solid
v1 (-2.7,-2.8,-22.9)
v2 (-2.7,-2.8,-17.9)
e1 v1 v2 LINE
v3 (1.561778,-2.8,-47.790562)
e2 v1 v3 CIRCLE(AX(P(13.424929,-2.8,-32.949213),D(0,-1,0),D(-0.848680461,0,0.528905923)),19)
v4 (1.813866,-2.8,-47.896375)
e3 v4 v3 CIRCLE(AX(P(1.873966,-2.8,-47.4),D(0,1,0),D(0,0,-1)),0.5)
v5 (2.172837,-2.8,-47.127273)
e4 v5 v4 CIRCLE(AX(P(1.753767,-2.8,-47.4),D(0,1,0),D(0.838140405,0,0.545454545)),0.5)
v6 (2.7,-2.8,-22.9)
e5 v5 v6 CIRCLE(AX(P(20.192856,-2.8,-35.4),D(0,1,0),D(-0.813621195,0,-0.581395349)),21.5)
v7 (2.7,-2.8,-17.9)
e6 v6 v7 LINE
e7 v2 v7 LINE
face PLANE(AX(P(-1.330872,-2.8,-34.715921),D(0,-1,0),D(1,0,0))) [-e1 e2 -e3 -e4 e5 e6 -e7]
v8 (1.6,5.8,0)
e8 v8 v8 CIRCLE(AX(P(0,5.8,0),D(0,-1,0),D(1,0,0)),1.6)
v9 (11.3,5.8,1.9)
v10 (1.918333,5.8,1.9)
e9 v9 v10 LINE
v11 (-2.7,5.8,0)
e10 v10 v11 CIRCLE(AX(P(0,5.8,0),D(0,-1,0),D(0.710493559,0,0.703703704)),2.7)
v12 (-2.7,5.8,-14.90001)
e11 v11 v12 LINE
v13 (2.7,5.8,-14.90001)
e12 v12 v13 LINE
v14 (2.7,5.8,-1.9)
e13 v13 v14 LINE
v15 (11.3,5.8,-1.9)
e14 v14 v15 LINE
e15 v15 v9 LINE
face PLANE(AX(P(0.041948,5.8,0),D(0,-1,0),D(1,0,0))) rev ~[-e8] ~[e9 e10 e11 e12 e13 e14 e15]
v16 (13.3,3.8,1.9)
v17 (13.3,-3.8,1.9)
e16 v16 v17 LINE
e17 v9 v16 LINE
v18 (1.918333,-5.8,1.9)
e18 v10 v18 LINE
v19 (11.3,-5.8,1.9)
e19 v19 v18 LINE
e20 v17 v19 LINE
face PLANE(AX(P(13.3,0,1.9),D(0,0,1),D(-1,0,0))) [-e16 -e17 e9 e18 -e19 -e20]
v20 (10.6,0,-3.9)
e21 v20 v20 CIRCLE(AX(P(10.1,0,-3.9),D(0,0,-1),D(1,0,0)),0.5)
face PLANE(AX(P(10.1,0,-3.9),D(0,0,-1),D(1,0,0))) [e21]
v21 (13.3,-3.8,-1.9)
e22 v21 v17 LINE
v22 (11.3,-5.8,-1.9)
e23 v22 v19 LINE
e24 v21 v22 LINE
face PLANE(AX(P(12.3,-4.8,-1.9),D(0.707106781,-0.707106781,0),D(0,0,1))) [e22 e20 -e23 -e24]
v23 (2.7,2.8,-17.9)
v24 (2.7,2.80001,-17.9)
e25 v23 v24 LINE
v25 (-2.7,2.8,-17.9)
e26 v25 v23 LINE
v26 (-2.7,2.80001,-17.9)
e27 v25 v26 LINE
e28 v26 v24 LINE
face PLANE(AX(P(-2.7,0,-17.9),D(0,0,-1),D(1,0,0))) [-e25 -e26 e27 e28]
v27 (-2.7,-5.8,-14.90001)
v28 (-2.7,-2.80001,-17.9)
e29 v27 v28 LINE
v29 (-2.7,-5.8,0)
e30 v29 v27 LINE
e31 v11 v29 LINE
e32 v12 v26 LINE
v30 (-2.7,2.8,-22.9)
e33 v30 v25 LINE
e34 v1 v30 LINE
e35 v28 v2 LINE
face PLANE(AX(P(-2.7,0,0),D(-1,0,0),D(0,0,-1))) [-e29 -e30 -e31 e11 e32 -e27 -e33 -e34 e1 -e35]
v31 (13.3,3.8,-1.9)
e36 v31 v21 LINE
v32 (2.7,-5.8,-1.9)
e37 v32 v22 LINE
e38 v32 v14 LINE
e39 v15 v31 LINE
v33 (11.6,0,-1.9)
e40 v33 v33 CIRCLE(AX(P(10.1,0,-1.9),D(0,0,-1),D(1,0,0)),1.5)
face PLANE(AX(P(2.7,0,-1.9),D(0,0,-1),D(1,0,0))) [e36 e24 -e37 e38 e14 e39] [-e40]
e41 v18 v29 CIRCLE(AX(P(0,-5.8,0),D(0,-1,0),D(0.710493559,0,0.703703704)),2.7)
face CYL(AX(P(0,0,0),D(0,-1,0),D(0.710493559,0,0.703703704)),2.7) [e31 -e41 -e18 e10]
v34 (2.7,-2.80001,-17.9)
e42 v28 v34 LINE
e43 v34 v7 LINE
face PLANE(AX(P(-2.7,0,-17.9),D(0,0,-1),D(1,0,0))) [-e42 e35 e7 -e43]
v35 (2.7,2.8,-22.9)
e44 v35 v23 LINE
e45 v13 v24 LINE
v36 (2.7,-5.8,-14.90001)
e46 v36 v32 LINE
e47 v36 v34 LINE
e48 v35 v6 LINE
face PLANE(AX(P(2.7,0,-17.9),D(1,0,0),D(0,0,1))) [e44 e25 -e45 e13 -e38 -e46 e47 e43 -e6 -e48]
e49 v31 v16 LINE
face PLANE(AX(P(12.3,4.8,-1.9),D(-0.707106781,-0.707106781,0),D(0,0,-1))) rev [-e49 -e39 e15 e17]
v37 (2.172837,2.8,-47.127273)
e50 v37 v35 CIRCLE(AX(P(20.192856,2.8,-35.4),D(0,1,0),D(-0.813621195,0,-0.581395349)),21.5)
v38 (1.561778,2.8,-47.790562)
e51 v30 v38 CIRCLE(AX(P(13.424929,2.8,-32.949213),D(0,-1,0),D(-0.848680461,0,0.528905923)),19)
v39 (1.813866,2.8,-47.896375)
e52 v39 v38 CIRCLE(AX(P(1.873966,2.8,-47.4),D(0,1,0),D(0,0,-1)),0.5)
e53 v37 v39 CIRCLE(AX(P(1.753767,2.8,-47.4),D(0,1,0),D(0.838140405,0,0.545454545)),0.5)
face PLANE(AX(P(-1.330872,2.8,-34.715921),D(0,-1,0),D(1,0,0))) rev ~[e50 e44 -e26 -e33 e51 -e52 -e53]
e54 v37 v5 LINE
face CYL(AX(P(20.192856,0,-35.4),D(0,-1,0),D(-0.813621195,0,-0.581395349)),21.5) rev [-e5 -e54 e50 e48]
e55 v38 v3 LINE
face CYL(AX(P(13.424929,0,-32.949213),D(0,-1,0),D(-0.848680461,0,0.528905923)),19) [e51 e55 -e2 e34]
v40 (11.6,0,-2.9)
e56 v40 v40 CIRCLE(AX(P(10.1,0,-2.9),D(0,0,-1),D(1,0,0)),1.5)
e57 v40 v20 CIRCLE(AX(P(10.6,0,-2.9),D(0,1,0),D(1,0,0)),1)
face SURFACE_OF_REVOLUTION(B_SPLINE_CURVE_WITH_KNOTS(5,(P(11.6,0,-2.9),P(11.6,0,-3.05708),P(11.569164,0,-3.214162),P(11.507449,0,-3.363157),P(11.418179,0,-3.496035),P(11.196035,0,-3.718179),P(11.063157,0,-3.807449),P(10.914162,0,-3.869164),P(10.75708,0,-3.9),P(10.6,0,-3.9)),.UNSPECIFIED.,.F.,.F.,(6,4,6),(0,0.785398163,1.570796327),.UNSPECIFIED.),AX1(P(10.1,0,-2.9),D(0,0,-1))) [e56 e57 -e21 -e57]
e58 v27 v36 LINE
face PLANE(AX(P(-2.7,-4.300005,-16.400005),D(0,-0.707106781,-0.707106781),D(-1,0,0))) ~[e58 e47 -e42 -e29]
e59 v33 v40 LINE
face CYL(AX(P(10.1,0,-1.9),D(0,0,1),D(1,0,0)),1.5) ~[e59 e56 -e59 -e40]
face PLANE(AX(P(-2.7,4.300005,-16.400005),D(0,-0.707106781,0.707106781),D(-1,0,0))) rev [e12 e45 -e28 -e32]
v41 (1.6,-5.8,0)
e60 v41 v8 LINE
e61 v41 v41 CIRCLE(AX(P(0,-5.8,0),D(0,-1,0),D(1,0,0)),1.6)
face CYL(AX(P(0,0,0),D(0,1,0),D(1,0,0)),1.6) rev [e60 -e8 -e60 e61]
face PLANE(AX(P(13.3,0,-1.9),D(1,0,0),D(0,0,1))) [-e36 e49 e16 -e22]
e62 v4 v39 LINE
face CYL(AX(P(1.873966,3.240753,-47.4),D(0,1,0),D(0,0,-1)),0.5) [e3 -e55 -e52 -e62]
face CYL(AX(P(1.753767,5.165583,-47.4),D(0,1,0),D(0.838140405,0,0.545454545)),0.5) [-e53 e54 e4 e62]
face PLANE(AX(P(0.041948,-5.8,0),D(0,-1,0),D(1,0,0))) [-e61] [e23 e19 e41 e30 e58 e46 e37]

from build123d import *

# Parameters (mm, degrees)
F0_R        = 1.6
F1_DEPTH    = 5.8
F0_W        = 5.4
F0_H        = 5
F2_DEPTH    = 2.8
F3_SIZE     = 2.99999
F4_R        = 1.5
F5_DEPTH    = 2
F6_R        = 1
F7_T1_DEPTH = 6.481505829
F7_T3_DEPTH = 10.3311661503
F8_SIZE     = 2


# Not quite as in the source:
# - a fillet or chamfer that OpenCascade refuses, or shapes differently, is made with other operations: its cross-section is extruded or revolved along the edge and cut away or added
# - a fillet or chamfer is up to 0.001 mm smaller than in the source, because OpenCascade refuses the exact size


with BuildPart() as f1:
    # F0 (on Front) → F1 (new body, symmetric)
    with BuildSketch(Plane.XZ):
        with BuildLine():
            ThreePointArc((1.9183326093, -1.9), (2.4969479415, -1.0272540958), (2.7, 0))
            ThreePointArc((2.7, 0), (2.4969479415, 1.0272540958), (1.9183326093, 1.9))
            ThreePointArc((1.9183326093, 1.9), (-1.0272540958, 2.4969479415), (-2.7, 0))
            ThreePointArc((-2.7, 0), (-1.0272540958, -2.4969479415), (1.9183326093, -1.9))
        make_face()
        Circle(F0_R, mode=Mode.SUBTRACT)
        with BuildLine():
            ThreePointArc((1.9183326093, 1.9), (2.4969479415, 1.0272540958), (2.7, 0))
            ThreePointArc((2.7, 0), (2.4969479415, -1.0272540958), (1.9183326093, -1.9))
            Line((1.9183326093, -1.9), (2.7, -1.9))
            Line((2.7, -1.9), (13.3, -1.9))
            Line((13.3, -1.9), (13.3, 1.9))
            Line((13.3, 1.9), (1.9183326093, 1.9))
        make_face()
        with BuildLine():
            Line((2.7, -1.9), (1.9183326093, -1.9))
            ThreePointArc((1.9183326093, -1.9), (-1.0272540958, -2.4969479415), (-2.7, 0))
            Line((-2.7, 0), (-2.7, -17.9))
            Line((-2.7, -17.9), (2.7, -17.9))
            Line((2.7, -17.9), (2.7, -1.9))
        make_face()
    extrude(amount=F1_DEPTH, both=True)

    # F0 (on Front) → F2 (join, symmetric)
    with BuildSketch(Plane.XZ):
        with BuildLine():
            Line((2.7, -22.9), (-2.7, -22.9))
            ThreePointArc((-2.7, -22.9), (-5.2874639524, -36.2425936556), (1.7, -47.9))
            Line((1.7, -47.9), (2.7, -47.9))
            ThreePointArc((2.7, -47.9), (-1.3071443155, -35.4), (2.7, -22.9))
        make_face()
        with Locations((0, -20.4)):
            Rectangle(F0_W, F0_H)
    extrude(amount=F2_DEPTH, both=True)

    # F3 (size 3 in the source; OpenCascade refuses exactly that, so slightly less here)
    f3_edges = [f1.edges().sort_by_distance(p)[0] for p in [
        (0, -5.8, -17.9),
        (0, 5.8, -17.9),
    ]]
    chamfer(f3_edges, length=F3_SIZE)

    # F4 (on face) → F5 (join)
    with BuildSketch(Plane(origin=(0, 0, -1.9), x_dir=(1, 0, 0), z_dir=(0, 0, -1))):
        with Locations((10.1, 0)):
            Circle(F4_R)
    extrude(amount=F5_DEPTH)

    # F6
    f6_edges = [f1.edges().sort_by_distance(p)[0] for p in [
        (8.6, 0, -3.9),
    ]]
    fillet(f6_edges, radius=F6_R)

    # F7: fillet of radius 0.5 on 2 edges, made by hand

    # F7_s2 → F7_t1 (cut)
    with BuildSketch(Plane.XZ.offset(-3.2407529145)):
        with BuildLine():
            ThreePointArc((1.8739659479, -47.9), (1.7085587408, -47.871847916), (1.561777764, -47.7905618233))
            ThreePointArc((1.561777764, -47.7905618233), (1.6307619466, -47.8454412332), (1.7, -47.9))
            Line((1.7, -47.9), (1.8739659479, -47.9))
        make_face()
    extrude(amount=F7_T1_DEPTH, mode=Mode.SUBTRACT)

    # F7_s4 → F7_t3 (cut)
    with BuildSketch(Plane.XZ.offset(-5.1655830752)):
        with BuildLine():
            ThreePointArc((2.1728369726, -47.1272727273), (2.1932913064, -47.6383656473), (1.7537667699, -47.9))
            Line((1.7537667699, -47.9), (2.7, -47.9))
            ThreePointArc((2.7, -47.9), (2.4322155262, -47.5165036692), (2.1728369726, -47.1272727273))
        make_face()
    extrude(amount=F7_T3_DEPTH, mode=Mode.SUBTRACT)

    # F8
    f8_edges = [f1.edges().sort_by_distance(p)[0] for p in [
        (13.3, -5.8, 0),
        (13.3, 5.8, 0),
    ]]
    chamfer(f8_edges, length=F8_SIZE)


solid = f1.part
